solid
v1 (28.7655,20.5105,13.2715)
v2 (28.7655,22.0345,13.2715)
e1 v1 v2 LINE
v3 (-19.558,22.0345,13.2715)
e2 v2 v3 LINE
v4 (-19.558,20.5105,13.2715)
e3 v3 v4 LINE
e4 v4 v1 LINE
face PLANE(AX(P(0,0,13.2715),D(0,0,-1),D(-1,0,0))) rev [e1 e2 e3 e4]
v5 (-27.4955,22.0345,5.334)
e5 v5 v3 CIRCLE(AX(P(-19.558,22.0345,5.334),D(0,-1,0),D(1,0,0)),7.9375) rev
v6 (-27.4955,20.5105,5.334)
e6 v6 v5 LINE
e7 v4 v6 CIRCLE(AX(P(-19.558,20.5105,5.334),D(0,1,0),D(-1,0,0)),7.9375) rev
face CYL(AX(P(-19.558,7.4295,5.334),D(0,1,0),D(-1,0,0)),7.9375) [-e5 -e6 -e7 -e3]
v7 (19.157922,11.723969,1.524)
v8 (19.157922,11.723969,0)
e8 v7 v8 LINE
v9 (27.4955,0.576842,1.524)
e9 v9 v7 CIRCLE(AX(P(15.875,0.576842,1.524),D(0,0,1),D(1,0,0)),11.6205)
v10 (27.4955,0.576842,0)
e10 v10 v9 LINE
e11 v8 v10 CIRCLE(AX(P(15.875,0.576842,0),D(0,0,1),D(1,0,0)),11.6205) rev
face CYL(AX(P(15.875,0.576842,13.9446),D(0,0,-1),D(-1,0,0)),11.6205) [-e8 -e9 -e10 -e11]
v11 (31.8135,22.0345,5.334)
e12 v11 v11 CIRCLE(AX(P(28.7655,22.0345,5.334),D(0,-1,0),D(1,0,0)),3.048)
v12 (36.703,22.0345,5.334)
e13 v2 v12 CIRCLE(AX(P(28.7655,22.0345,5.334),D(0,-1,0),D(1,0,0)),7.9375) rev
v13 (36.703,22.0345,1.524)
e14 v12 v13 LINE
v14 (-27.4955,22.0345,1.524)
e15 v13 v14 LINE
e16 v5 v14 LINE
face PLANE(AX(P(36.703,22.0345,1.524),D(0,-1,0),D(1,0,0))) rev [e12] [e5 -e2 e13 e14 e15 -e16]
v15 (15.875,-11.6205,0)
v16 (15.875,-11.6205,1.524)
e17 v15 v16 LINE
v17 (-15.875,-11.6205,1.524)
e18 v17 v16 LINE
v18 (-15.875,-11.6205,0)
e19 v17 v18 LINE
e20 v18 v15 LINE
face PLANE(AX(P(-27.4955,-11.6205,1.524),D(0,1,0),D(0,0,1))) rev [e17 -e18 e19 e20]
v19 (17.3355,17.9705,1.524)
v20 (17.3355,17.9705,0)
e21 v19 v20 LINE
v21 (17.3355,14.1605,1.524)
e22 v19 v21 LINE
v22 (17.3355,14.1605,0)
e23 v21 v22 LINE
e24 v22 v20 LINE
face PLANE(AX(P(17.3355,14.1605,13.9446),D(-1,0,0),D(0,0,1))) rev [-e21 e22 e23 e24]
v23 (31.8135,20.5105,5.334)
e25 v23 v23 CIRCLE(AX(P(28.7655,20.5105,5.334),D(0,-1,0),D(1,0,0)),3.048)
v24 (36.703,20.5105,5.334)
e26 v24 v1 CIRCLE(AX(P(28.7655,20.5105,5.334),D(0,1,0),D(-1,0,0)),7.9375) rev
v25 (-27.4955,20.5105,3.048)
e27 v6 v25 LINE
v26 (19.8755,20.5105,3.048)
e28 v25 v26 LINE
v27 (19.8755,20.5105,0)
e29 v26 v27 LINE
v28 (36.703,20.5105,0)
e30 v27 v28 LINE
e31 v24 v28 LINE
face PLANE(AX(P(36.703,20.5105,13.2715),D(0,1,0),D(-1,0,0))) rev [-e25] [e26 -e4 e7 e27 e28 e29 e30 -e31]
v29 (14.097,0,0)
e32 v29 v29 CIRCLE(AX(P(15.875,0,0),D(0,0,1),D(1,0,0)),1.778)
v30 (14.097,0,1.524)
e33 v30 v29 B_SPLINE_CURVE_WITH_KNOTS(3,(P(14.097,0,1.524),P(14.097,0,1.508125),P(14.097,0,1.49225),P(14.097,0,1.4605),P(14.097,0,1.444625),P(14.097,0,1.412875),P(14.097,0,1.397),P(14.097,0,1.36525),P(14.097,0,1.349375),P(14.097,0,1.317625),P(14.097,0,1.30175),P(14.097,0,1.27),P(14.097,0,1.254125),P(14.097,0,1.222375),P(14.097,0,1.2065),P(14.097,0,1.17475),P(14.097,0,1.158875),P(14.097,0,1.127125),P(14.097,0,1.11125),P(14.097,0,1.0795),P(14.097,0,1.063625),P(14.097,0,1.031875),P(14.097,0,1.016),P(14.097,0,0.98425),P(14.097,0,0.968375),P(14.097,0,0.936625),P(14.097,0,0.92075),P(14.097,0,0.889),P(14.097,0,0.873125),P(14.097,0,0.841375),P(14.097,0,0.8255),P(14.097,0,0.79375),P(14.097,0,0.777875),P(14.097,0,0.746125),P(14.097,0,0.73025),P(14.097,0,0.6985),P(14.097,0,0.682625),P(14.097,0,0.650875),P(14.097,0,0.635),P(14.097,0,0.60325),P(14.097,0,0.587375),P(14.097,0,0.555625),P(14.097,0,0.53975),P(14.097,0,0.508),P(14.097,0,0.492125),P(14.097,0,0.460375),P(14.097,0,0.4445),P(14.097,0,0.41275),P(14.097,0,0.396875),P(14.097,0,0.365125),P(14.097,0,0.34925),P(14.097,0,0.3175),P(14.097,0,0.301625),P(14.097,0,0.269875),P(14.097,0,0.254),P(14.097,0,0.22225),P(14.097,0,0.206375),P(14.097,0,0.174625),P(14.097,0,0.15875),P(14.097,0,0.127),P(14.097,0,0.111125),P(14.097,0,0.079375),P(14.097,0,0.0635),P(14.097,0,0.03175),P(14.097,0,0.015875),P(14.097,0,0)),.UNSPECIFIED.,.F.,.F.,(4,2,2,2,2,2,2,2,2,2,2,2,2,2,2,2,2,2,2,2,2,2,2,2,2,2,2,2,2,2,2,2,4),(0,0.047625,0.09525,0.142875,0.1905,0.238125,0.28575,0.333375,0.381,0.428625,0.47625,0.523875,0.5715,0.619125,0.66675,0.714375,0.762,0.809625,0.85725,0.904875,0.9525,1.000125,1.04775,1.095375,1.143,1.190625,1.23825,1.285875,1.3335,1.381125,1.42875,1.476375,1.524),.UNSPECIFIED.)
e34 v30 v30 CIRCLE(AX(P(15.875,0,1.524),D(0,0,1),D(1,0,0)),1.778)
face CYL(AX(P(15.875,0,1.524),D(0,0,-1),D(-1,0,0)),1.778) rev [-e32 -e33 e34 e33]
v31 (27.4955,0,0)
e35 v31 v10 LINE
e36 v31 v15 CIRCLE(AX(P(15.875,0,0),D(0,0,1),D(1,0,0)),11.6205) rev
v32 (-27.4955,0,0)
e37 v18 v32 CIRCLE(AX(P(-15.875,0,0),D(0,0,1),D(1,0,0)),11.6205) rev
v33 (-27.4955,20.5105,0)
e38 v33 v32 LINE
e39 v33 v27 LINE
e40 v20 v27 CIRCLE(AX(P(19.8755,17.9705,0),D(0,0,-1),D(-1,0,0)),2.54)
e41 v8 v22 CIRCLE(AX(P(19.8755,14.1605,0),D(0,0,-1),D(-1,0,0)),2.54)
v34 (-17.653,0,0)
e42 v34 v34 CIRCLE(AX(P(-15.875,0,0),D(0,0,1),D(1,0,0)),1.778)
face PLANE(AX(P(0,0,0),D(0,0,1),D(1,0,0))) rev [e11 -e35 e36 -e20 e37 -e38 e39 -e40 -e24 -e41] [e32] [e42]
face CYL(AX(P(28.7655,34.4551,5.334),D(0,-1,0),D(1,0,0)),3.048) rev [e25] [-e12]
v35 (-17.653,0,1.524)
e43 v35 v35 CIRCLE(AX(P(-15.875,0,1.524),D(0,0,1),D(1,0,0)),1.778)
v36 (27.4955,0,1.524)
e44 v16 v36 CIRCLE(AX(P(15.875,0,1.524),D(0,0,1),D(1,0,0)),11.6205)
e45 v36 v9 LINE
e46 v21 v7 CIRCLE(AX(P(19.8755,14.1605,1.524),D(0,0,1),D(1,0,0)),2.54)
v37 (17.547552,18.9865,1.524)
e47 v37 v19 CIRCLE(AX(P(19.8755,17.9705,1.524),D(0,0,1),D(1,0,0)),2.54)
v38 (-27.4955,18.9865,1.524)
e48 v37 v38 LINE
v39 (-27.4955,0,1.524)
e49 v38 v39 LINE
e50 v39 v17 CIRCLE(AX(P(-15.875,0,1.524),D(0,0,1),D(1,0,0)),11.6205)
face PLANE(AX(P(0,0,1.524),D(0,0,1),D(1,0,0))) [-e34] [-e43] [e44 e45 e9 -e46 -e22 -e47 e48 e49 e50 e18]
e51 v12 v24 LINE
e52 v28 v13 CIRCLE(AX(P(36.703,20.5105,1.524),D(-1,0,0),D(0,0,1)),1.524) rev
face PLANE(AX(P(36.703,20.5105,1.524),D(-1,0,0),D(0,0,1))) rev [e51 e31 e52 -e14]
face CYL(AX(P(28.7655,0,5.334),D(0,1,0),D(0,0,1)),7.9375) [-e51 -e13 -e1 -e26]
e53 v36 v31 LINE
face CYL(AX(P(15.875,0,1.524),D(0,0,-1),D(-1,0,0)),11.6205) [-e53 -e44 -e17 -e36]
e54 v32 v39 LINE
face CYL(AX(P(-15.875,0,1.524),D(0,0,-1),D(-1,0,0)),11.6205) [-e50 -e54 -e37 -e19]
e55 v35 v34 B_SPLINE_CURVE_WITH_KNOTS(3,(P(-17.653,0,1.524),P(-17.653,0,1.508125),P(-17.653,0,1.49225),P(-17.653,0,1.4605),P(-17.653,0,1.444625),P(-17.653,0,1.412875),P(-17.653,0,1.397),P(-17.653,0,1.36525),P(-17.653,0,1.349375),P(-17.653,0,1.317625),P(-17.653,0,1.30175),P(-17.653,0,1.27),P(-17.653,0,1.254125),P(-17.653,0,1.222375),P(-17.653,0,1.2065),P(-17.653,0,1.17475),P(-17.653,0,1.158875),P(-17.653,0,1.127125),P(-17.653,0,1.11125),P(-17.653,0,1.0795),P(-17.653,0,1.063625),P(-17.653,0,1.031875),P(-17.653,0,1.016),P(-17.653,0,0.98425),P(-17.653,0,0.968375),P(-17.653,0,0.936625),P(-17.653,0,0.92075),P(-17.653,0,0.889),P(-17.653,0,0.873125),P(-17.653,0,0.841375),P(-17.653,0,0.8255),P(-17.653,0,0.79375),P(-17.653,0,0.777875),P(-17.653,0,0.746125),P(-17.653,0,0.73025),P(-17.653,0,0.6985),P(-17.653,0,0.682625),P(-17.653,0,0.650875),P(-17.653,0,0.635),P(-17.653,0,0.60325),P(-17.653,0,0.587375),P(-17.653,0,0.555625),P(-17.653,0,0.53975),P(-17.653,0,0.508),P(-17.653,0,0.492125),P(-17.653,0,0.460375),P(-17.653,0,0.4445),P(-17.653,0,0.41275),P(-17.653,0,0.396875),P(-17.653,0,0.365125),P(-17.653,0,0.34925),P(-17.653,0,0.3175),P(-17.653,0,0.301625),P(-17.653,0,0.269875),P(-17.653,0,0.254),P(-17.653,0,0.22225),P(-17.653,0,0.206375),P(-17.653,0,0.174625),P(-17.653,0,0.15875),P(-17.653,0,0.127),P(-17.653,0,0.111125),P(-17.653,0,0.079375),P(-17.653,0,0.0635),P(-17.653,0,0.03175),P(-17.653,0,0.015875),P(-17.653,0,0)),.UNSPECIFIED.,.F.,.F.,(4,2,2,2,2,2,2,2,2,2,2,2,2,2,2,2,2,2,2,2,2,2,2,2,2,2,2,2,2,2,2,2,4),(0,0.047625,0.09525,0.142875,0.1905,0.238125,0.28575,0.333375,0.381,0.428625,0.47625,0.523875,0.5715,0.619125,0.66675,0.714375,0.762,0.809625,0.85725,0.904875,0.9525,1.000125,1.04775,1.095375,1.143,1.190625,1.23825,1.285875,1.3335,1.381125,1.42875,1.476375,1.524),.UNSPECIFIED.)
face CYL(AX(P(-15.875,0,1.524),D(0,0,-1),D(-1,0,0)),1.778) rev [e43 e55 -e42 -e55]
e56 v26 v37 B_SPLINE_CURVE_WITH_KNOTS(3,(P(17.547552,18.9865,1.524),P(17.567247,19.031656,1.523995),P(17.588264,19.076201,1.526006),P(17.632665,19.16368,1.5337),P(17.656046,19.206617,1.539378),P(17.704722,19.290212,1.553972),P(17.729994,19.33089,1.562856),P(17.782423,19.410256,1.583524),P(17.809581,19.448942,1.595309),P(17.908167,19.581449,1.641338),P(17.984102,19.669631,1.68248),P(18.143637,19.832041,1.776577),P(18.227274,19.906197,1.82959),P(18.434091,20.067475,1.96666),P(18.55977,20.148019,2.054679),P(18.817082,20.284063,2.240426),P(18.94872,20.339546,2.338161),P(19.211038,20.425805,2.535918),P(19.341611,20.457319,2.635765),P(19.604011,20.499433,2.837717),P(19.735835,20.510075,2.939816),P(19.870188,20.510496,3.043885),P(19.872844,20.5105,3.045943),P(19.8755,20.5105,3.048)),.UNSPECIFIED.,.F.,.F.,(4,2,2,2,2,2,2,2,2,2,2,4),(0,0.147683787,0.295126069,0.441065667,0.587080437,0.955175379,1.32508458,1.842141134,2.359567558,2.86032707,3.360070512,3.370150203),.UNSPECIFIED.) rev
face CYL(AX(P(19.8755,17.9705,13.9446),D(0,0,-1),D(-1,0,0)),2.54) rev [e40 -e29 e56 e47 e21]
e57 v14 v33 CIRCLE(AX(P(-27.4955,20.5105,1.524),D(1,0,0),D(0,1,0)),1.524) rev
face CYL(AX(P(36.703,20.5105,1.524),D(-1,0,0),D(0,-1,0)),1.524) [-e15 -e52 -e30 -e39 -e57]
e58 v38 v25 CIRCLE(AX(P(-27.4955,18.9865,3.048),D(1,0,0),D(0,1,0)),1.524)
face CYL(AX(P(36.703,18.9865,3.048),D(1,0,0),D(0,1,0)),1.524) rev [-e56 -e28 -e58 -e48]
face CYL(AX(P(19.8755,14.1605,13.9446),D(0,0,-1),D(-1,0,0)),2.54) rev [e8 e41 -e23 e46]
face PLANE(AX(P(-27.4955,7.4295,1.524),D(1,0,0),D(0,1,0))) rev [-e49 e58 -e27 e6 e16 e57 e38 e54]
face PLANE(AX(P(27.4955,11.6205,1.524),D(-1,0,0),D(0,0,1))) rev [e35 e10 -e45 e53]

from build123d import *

# Parameters (mm, degrees)
SKETCH1_R           = 1.778
BOSS_EXTRUDE1_DEPTH = 1.524
SKETCH2_W           = 19.05
SKETCH2_H           = 1.524
BOSS_EXTRUDE2_DEPTH = 11.7475
SKETCH3_R           = 3.048
CUT_EXTRUDE2_DEPTH  = 13.9446
CUT_EXTRUDE3_DEPTH  = 13.9446
SKETCH5_W           = 45.1485
SKETCH5_H           = 1.524
BOSS_EXTRUDE3_DEPTH = 11.7475
FILLET1_R           = 7.9375
FILLET3_R           = 11.6205
FILLET4_R           = 11.6205
FILLET5_R           = 1.524
FILLET6_R           = 1.524
FILLET7_R           = 7.9375


with BuildPart() as part:
    # Sketch1 → Boss-Extrude1 (new body)
    with BuildSketch(Plane.XY):
        Polygon((27.4955, 11.6205), (36.703, 20.5105), (36.703, 22.0345), (-27.4955, 22.0345), (-27.4955, 7.4295), (-27.4955, -11.6205), (27.4955, -11.6205), align=None)
        with Locations(Location((15.875, 0, 0), (0, 0, 180))):
            Circle(SKETCH1_R, mode=Mode.SUBTRACT)
        with Locations(Location((-15.875, 0, 0), (0, 0, 180))):
            Circle(SKETCH1_R, mode=Mode.SUBTRACT)
    extrude(amount=BOSS_EXTRUDE1_DEPTH)

    # Sketch2 → Boss-Extrude2 (add)
    with BuildSketch(Plane.XY.offset(1.524)):
        with Locations((27.178, 21.2725)):
            Rectangle(SKETCH2_W, SKETCH2_H)
    extrude(amount=BOSS_EXTRUDE2_DEPTH)

    # Sketch3 → Cut-Extrude2 (cut)
    with BuildSketch(Plane.XZ.offset(-20.5105)):
        with Locations((28.7655, 5.334)):
            Circle(SKETCH3_R)
    extrude(amount=-CUT_EXTRUDE2_DEPTH, mode=Mode.SUBTRACT)

    # Sketch4 → Cut-Extrude3 (cut)
    with BuildSketch(Plane(origin=(0, 0, 0), x_dir=(-1, 0, 0), z_dir=(0, 0, -1))):
        with BuildLine():
            Line((-19.8755, 11.6205), (-36.703, 11.6205))
            Line((-36.703, 11.6205), (-36.703, 20.5105))
            Line((-36.703, 20.5105), (-19.8755, 20.5105))
            ThreePointArc((-19.8755, 20.5105), (-18.079448776, 19.766551224), (-17.3355, 17.9705))
            Line((-17.3355, 17.9705), (-17.3355, 14.1605))
            ThreePointArc((-17.3355, 14.1605), (-18.079448776, 12.364448776), (-19.8755, 11.6205))
        make_face()
    extrude(amount=-CUT_EXTRUDE3_DEPTH, mode=Mode.SUBTRACT)

    # Sketch5 → Boss-Extrude3 (add)
    with BuildSketch(Plane.XY.offset(1.524)):
        with Locations((-4.92125, 21.2725)):
            Rectangle(SKETCH5_W, SKETCH5_H)
    extrude(amount=BOSS_EXTRUDE3_DEPTH)

    # Fillet1
    fillet1_edges = [part.edges().sort_by_distance(p)[0] for p in [
        (36.703, 21.2725, 13.2715),
    ]]
    fillet(fillet1_edges, radius=FILLET1_R)

    # Fillet3
    fillet3_edges = [part.edges().sort_by_distance(p)[0] for p in [
        (27.4955, -11.6205, 0.762),
    ]]
    fillet(fillet3_edges, radius=FILLET3_R)

    # Fillet4
    fillet4_edges = [part.edges().sort_by_distance(p)[0] for p in [
        (-27.4955, -11.6205, 0.762),
        (27.4955, 11.6205, 0.762),
    ]]
    fillet(fillet4_edges, radius=FILLET4_R)

    # Fillet5
    fillet5_edges = [part.edges().sort_by_distance(p)[0] for p in [
        (-3.81, 20.5105, 1.524),
    ]]
    fillet(fillet5_edges, radius=FILLET5_R)

    # Fillet6
    fillet6_edges = [part.edges().sort_by_distance(p)[0] for p in [
        (4.60375, 22.0345, 0),
    ]]
    fillet(fillet6_edges, radius=FILLET6_R - 0.0001)  # a hair under: the kernel refuses the full size

    # Fillet7
    fillet7_edges = [part.edges().sort_by_distance(p)[0] for p in [
        (-27.4955, 21.2725, 13.2715),
    ]]
    fillet(fillet7_edges, radius=FILLET7_R)


solid = part.part
